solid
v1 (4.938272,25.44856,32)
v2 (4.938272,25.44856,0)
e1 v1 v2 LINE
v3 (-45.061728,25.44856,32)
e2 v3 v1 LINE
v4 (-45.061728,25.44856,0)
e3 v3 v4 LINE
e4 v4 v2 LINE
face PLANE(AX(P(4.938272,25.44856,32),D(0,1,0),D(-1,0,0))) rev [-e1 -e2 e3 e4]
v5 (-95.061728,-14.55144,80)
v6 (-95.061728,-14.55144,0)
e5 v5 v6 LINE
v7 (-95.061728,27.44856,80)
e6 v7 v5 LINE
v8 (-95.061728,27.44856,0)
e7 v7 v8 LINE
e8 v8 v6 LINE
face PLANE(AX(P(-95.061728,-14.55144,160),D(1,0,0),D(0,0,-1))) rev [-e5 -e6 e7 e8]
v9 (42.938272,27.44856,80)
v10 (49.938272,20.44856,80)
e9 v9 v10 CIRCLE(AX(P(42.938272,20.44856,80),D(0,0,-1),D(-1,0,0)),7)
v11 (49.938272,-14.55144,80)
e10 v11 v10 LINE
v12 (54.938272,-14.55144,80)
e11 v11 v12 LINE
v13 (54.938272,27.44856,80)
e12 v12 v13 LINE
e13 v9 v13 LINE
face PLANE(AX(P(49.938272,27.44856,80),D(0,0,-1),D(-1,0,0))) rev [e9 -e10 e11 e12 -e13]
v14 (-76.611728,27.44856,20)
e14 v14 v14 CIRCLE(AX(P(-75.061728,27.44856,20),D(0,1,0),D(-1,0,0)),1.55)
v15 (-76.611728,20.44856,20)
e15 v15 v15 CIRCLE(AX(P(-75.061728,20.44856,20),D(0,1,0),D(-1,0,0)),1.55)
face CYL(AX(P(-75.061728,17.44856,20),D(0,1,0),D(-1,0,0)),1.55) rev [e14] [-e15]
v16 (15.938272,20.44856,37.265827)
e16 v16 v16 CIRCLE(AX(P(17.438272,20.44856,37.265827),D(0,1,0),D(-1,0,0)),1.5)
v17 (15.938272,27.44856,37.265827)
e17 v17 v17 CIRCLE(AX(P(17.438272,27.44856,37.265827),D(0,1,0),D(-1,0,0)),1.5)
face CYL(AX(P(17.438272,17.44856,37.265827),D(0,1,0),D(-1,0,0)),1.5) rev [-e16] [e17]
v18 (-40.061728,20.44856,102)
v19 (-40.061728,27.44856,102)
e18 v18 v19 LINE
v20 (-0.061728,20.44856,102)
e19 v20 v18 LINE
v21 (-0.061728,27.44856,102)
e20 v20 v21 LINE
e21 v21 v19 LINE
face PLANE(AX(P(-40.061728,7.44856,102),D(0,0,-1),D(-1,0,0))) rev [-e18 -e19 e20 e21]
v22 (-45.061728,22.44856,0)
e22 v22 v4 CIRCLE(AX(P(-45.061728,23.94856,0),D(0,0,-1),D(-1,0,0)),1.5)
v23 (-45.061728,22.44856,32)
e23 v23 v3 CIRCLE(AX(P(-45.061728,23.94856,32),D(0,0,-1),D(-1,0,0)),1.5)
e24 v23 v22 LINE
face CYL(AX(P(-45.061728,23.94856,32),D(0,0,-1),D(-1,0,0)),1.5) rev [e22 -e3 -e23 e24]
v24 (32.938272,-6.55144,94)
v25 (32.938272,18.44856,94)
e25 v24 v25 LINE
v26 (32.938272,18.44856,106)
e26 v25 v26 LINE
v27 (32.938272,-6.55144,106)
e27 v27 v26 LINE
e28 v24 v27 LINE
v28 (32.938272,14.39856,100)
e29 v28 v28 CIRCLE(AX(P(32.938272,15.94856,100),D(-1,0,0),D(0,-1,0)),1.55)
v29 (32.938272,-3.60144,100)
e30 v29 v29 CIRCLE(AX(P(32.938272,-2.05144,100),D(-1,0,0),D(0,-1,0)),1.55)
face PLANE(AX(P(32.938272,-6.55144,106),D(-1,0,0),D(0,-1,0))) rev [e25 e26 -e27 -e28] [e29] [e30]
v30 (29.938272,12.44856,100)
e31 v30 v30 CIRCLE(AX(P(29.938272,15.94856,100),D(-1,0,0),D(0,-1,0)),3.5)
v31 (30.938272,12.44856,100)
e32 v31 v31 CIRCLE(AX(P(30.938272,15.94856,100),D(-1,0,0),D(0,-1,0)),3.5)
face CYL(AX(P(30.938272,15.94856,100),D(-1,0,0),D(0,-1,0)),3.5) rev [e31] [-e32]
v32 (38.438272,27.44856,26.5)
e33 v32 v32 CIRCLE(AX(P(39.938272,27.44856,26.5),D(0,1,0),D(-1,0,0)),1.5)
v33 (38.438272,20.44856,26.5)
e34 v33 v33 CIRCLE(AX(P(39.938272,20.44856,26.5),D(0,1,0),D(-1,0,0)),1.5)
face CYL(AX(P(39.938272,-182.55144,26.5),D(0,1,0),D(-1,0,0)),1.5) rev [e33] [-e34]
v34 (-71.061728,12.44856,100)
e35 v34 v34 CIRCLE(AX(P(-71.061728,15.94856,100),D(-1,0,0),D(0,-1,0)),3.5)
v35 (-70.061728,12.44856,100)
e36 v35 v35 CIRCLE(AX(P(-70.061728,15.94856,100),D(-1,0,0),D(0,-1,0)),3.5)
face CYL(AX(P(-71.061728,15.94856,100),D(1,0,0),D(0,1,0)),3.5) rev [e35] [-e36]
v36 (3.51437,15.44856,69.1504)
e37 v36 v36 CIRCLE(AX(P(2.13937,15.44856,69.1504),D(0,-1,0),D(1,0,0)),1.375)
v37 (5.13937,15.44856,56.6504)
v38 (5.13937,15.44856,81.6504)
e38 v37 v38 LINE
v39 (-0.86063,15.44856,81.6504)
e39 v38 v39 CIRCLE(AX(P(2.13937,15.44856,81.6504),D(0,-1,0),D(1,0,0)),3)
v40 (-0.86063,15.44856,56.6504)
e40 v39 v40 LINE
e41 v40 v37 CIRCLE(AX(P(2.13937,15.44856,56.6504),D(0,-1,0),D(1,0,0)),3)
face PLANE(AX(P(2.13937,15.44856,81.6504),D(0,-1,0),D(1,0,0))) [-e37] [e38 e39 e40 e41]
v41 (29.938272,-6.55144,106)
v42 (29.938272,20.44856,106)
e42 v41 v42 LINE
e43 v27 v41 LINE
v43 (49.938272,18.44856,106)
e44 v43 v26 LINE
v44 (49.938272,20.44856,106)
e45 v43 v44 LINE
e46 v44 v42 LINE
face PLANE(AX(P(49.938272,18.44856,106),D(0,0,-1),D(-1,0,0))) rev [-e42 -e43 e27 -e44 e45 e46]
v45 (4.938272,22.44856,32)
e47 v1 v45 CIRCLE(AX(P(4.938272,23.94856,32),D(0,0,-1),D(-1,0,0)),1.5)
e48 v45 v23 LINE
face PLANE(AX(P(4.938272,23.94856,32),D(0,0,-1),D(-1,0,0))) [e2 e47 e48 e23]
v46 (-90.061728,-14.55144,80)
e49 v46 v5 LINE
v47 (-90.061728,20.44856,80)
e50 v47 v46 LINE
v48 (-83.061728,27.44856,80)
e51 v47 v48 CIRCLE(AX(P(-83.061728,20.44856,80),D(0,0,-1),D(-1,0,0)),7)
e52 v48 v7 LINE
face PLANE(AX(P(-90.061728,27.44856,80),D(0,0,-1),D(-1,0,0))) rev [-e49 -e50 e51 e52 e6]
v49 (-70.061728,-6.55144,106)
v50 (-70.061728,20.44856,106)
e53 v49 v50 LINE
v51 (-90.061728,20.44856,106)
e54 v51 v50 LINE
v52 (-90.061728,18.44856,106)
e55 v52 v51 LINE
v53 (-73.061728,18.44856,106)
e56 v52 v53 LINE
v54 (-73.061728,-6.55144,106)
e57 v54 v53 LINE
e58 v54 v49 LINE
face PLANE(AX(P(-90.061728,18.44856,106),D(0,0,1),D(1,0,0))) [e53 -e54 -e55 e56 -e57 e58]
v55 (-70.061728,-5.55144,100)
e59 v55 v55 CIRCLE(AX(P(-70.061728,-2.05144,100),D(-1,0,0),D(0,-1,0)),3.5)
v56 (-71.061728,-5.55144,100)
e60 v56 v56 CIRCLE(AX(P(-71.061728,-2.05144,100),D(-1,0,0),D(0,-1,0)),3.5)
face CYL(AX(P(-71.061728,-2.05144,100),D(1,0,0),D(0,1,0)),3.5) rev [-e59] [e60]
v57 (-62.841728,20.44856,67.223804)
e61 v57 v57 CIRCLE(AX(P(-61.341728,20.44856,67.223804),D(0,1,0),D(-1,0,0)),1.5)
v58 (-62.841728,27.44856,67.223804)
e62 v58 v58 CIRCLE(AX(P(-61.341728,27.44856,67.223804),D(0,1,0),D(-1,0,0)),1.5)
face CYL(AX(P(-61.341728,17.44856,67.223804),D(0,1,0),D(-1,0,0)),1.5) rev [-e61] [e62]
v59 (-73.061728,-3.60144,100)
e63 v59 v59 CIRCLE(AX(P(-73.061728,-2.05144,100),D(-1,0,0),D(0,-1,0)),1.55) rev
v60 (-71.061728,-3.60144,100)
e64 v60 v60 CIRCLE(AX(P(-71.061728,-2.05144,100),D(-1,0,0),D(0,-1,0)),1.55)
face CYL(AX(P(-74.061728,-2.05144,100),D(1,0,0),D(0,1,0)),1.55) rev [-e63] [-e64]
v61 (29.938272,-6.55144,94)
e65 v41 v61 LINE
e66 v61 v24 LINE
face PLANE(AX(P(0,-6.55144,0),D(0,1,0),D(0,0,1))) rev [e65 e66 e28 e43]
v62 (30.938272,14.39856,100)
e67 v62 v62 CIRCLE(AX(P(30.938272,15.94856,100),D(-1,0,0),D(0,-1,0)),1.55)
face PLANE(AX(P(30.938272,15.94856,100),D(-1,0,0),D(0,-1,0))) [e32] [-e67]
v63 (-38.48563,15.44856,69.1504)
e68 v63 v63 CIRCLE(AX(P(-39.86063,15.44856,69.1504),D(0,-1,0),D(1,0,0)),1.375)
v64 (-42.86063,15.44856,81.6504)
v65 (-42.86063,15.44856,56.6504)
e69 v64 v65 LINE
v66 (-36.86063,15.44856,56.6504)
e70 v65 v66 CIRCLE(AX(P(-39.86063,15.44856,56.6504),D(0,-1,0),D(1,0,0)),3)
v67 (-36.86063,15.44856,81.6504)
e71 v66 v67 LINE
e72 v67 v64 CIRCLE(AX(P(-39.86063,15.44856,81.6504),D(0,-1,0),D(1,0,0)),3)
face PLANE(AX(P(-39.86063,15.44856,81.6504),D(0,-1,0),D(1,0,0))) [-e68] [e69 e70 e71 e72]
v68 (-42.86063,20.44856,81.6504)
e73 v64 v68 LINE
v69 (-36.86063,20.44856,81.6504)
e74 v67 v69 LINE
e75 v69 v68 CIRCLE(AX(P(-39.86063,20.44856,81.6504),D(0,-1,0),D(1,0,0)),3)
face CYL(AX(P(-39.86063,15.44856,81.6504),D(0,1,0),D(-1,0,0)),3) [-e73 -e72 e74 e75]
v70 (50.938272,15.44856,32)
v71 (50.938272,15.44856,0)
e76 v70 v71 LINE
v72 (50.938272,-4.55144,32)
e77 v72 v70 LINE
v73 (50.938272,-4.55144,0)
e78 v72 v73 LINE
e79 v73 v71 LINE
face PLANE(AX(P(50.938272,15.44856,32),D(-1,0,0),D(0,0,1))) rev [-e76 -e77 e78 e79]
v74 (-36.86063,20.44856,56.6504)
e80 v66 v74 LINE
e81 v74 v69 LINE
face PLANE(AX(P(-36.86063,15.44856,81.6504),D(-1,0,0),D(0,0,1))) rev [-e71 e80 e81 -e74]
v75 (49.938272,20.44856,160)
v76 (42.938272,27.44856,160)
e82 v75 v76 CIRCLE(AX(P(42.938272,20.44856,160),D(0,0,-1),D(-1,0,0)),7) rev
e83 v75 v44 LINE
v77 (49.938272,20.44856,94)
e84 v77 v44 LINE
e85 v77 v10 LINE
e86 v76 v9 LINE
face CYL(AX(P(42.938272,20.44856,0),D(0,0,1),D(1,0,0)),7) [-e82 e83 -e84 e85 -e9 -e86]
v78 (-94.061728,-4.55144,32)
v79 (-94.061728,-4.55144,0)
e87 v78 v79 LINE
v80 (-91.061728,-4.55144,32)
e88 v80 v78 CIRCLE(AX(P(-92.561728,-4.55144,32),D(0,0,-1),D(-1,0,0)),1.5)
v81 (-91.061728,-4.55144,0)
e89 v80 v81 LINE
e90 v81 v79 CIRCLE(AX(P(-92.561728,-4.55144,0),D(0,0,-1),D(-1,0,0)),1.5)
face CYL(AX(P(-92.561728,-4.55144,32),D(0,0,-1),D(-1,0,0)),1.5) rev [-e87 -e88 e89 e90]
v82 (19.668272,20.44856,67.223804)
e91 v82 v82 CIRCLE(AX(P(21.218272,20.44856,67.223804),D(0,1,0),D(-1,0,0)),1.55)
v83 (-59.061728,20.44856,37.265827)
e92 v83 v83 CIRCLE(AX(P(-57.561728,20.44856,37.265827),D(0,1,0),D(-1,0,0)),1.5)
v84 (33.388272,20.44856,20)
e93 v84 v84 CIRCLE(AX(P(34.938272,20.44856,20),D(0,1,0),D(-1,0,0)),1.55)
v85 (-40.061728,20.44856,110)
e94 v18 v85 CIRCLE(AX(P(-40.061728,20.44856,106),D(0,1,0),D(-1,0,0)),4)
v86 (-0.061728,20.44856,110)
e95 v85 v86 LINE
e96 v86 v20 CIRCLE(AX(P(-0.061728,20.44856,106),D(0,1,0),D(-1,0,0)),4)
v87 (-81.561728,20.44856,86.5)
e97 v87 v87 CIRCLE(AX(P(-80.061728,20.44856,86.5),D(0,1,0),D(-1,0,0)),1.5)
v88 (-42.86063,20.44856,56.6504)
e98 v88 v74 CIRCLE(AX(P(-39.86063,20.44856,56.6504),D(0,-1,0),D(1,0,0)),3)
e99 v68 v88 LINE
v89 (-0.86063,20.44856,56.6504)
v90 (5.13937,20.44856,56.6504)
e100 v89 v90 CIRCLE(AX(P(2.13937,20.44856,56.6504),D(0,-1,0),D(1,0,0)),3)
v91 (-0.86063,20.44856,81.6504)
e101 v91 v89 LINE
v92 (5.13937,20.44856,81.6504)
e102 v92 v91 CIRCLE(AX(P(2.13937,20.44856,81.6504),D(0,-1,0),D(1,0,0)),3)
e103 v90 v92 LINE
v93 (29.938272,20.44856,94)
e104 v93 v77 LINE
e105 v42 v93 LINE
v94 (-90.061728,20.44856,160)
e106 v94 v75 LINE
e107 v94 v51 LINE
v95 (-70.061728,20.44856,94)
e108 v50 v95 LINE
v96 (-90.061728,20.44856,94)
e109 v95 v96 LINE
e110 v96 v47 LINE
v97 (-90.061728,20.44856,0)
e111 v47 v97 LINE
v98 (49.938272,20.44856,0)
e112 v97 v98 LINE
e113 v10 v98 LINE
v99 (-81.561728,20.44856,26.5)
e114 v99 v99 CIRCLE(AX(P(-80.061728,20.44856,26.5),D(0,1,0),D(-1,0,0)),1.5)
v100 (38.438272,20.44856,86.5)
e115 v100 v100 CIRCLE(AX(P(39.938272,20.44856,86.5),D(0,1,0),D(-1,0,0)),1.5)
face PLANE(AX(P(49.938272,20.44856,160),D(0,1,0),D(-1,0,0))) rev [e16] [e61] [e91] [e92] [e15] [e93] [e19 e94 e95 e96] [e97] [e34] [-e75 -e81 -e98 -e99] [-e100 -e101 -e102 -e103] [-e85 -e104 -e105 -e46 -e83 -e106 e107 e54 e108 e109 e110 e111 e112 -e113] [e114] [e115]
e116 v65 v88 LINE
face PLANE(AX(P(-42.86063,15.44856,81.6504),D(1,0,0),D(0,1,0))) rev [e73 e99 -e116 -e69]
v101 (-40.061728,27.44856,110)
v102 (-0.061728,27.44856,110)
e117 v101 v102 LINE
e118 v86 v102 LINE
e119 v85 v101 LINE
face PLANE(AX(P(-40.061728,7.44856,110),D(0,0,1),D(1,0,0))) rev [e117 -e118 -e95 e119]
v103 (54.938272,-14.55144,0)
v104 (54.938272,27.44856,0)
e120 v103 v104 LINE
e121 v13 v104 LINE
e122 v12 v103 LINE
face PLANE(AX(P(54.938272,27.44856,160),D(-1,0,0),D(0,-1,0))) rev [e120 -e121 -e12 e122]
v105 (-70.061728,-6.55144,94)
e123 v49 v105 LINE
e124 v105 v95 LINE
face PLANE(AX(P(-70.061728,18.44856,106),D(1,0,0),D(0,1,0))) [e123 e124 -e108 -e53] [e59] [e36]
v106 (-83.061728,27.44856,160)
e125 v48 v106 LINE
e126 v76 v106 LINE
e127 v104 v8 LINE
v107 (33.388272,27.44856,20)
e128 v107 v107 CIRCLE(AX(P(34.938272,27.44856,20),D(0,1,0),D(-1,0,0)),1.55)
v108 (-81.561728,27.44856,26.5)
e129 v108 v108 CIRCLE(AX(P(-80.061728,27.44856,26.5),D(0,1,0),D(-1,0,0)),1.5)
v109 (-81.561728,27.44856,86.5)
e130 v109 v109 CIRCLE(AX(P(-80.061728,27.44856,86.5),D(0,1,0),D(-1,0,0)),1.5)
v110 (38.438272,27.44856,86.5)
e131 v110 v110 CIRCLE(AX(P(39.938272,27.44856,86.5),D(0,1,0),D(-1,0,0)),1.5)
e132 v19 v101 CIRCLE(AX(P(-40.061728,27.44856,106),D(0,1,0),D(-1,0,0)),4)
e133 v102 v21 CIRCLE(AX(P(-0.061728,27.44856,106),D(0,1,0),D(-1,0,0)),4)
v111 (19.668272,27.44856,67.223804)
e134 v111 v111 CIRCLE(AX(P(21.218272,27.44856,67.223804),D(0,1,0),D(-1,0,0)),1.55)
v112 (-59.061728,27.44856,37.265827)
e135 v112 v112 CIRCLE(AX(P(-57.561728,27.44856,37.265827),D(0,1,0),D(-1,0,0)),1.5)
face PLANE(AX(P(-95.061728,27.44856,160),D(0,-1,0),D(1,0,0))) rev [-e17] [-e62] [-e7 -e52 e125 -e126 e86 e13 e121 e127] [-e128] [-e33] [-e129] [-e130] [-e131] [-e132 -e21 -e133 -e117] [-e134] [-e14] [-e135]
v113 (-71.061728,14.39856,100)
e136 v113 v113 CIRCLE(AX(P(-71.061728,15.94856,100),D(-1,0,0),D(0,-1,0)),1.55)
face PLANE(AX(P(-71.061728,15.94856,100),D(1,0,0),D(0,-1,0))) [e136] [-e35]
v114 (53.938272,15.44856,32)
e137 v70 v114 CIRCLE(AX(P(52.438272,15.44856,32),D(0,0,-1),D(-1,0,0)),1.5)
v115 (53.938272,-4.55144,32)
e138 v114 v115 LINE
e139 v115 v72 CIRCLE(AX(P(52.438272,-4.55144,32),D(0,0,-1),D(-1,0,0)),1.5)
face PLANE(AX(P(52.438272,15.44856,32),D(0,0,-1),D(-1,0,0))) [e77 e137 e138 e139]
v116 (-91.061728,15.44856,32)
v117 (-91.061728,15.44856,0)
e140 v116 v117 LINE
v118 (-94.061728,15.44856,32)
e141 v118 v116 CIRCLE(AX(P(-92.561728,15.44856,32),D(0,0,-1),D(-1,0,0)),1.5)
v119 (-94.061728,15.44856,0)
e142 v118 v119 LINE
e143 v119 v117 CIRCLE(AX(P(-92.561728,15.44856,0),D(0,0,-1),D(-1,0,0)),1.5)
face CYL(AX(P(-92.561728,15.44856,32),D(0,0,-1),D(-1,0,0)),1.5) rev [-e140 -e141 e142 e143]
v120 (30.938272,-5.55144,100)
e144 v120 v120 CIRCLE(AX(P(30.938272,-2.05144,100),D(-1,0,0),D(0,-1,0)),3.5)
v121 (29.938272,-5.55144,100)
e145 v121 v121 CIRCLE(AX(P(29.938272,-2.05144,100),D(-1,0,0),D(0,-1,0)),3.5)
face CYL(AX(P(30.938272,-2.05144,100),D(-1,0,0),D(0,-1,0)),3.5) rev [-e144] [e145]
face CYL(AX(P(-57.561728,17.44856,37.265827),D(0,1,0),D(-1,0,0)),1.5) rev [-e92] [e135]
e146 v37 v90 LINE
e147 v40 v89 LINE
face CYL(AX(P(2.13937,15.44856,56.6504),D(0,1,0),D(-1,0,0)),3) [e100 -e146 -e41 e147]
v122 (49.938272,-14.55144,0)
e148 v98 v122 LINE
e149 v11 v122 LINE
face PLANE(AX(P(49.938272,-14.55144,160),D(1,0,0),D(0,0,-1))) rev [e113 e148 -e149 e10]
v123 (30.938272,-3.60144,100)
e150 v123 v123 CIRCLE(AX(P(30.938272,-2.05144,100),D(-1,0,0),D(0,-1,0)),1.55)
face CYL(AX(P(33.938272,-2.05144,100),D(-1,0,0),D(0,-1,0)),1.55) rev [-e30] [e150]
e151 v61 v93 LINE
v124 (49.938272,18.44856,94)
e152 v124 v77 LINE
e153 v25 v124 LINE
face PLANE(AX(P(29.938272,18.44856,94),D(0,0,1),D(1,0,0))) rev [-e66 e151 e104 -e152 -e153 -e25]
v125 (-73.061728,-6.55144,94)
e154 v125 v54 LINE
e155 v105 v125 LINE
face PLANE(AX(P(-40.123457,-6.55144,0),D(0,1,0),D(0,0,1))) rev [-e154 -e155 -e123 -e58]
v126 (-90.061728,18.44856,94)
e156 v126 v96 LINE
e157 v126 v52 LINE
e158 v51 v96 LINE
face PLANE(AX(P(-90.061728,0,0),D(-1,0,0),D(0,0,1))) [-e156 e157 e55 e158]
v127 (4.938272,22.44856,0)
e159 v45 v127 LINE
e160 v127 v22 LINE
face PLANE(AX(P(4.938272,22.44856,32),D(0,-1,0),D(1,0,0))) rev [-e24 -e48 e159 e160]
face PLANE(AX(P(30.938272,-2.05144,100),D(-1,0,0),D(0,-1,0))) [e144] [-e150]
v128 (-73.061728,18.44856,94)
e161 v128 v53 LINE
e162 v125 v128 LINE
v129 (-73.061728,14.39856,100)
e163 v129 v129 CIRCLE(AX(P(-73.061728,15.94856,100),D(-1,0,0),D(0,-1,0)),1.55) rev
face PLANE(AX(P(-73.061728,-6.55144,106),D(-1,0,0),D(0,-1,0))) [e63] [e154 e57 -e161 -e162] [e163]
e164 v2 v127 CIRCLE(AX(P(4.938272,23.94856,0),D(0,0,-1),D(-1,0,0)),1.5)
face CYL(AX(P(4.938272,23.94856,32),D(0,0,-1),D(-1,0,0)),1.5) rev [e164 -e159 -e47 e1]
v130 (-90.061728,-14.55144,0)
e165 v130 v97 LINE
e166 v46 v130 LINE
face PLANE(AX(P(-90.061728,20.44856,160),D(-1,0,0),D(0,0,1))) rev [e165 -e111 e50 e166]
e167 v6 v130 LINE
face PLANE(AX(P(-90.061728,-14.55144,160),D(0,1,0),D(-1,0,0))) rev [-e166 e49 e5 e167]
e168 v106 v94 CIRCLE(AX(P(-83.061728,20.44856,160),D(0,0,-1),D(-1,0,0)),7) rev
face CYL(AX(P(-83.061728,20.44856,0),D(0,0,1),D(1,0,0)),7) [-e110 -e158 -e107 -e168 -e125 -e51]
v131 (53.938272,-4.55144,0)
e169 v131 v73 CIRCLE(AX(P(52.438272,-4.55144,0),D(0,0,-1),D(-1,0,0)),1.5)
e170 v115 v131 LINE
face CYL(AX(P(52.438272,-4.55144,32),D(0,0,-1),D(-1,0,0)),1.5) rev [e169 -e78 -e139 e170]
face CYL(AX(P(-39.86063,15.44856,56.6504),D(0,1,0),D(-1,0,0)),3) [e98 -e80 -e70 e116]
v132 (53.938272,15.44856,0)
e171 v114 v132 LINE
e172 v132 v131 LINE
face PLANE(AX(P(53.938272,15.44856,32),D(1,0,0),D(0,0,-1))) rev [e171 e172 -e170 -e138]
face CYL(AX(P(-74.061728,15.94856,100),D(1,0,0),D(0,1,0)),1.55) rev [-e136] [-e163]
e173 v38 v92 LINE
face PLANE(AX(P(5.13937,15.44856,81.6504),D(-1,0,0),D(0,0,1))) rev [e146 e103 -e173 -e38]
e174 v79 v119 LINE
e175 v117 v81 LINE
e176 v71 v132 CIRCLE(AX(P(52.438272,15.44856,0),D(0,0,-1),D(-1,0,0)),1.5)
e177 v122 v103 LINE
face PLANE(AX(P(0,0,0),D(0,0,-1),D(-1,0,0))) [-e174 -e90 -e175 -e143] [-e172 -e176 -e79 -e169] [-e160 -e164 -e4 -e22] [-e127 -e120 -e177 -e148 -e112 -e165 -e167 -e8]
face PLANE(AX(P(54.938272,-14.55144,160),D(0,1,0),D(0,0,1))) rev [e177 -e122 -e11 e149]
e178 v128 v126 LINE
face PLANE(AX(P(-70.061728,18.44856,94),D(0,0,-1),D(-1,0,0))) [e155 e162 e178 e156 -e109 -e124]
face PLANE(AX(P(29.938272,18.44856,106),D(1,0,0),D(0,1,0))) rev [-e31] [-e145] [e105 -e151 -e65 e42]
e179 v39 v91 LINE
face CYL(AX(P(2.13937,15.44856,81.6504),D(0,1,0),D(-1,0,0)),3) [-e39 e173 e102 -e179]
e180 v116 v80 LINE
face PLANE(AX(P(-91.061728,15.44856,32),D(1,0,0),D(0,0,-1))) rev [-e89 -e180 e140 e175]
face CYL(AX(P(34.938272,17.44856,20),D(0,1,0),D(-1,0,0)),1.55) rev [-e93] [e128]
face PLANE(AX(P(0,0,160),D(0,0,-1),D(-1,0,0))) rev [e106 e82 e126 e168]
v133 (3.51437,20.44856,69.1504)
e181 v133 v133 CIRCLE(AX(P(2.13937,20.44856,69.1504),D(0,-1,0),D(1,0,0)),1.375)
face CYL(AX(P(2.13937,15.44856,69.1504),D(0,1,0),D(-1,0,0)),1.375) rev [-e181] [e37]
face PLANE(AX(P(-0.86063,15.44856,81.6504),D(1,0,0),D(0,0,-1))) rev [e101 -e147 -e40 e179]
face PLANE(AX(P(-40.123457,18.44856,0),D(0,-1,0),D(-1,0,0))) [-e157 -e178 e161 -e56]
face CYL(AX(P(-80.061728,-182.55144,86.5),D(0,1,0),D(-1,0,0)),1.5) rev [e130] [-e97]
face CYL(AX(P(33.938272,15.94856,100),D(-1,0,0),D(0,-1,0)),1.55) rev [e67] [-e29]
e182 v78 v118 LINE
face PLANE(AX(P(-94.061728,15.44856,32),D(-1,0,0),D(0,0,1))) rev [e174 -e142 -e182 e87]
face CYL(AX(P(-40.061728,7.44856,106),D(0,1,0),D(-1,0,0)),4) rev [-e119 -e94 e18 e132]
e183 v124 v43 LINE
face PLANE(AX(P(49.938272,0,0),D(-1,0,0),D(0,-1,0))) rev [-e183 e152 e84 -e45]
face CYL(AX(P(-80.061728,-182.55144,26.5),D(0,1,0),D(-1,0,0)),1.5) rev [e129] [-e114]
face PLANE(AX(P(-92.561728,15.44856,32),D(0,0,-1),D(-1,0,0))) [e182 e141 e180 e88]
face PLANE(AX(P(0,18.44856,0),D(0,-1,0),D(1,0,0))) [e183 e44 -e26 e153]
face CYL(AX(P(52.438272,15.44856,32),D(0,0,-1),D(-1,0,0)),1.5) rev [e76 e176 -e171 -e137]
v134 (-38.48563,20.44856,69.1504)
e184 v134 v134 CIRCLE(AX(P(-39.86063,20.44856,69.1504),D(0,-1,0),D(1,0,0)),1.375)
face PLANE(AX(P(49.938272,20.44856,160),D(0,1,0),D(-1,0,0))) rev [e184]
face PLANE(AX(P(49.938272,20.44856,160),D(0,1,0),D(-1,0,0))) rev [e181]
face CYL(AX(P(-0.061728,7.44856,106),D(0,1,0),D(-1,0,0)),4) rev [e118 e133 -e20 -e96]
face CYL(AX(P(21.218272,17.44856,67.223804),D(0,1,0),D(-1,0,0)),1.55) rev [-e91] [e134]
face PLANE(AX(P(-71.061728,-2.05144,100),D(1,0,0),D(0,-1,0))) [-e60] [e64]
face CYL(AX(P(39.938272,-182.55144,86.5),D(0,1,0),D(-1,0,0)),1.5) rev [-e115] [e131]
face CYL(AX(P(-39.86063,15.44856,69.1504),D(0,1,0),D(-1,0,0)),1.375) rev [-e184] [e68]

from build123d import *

# Parameters (mm, degrees)
BOSS_EXTRUDE1_DEPTH = 160
CUT_EXTRUDE1_DEPTH  = 32
SKETCH3_R           = 7.5
CUT_EXTRUDE2_DEPTH  = 210
SKETCH5_R           = 1.5
CUT_EXTRUDE4_DEPTH  = 210
CUT_EXTRUDE6_DEPTH  = 20
SKETCH8_R           = 1.55
CUT_EXTRUDE7_DEPTH  = 10
SKETCH9_W           = 20
SKETCH9_H           = 12
BOSS_EXTRUDE3_DEPTH = 2
SKETCH10_W          = 3
SKETCH10_H          = 12
BOSS_EXTRUDE4_DEPTH = 25
SKETCH11_R          = 3.5
CUT_EXTRUDE8_DEPTH  = 1
SKETCH12_R          = 1.55
CUT_EXTRUDE9_DEPTH  = 3
SKETCH13_R          = 1.5
SKETCH13_R_2        = 1.55
CUT_EXTRUDE10_DEPTH = 10
SKETCH14_R          = 1.375
BOSS_EXTRUDE5_DEPTH = 5
SKETCH15_W          = 80
SKETCH15_H          = 42
CUT_EXTRUDE11_DEPTH = 5
FILLET1_R           = 7
SKETCH16_W          = 80
SKETCH16_H          = 42
CUT_EXTRUDE12_DEPTH = 5
FILLET2_R           = 7


with BuildPart() as part:
    # Sketch1 → Boss-Extrude1 (new body)
    with BuildSketch(Plane.XY):
        Polygon((-95.061728395, -14.551440329), (-95.061728395, 27.448559671), (54.938271605, 27.448559671), (54.938271605, -14.551440329), (49.938271605, -14.551440329), (49.938271605, 20.448559671), (-90.061728395, 20.448559671), (-90.061728395, -14.551440329), align=None)
    extrude(amount=BOSS_EXTRUDE1_DEPTH)

    # Sketch2 → Cut-Extrude1 (cut)
    with BuildSketch(Plane(origin=(0, 0, 0), x_dir=(-1, 0, 0), z_dir=(0, 0, -1))):
        with BuildLine():
            Line((-50.938271605, 15.448559671), (-50.938271605, -4.551440329))
            ThreePointArc((-50.938271605, -4.551440329), (-52.438271605, -6.051440329), (-53.938271605, -4.551440329))
            Line((-53.938271605, -4.551440329), (-53.938271605, 15.448559671))
            ThreePointArc((-53.938271605, 15.448559671), (-52.438271605, 16.948559671), (-50.938271605, 15.448559671))
        make_face()
        with BuildLine():
            Line((-4.938271605, 25.448559671), (45.061728395, 25.448559671))
            ThreePointArc((45.061728395, 25.448559671), (46.561728395, 23.948559671), (45.061728395, 22.448559671))
            Line((45.061728395, 22.448559671), (-4.938271605, 22.448559671))
            ThreePointArc((-4.938271605, 22.448559671), (-6.438271605, 23.948559671), (-4.938271605, 25.448559671))
        make_face()
        with BuildLine():
            Line((94.061728395, 15.448559671), (94.061728395, -4.551440329))
            ThreePointArc((94.061728395, -4.551440329), (92.561728395, -6.051440329), (91.061728395, -4.551440329))
            Line((91.061728395, -4.551440329), (91.061728395, 15.448559671))
            ThreePointArc((91.061728395, 15.448559671), (92.561728395, 16.948559671), (94.061728395, 15.448559671))
        make_face()
    extrude(amount=-CUT_EXTRUDE1_DEPTH, mode=Mode.SUBTRACT)

    # Sketch3 → Cut-Extrude2 (cut)
    with BuildSketch(Plane.ZY.offset(95.061728395)):
        with Locations((120, 7.448559671)):
            Circle(SKETCH3_R)
    extrude(amount=-CUT_EXTRUDE2_DEPTH, mode=Mode.SUBTRACT)

    # Sketch5 → Cut-Extrude4 (cut)
    with BuildSketch(Plane(origin=(0, 27.448559671, 0), x_dir=(1, 0, 0), z_dir=(0, 1, 0))):
        with Locations(Location((-80.061728395, -26.5, 0), (0, 0, 180))):
            Circle(SKETCH5_R)
        with Locations(Location((39.938271605, -26.5, 0), (0, 0, 180))):
            Circle(SKETCH5_R)
        with Locations(Location((-80.061728395, -86.5, 0), (0, 0, 180))):
            Circle(SKETCH5_R)
        with Locations(Location((39.938271605, -86.5, 0), (0, 0, 180))):
            Circle(SKETCH5_R)
    extrude(amount=-CUT_EXTRUDE4_DEPTH, mode=Mode.SUBTRACT)

    # Sketch7 → Cut-Extrude6 (cut)
    with BuildSketch(Plane(origin=(0, 27.448559671, 0), x_dir=(1, 0, 0), z_dir=(0, 1, 0))):
        with BuildLine():
            Line((-40.061728395, -102), (-0.061728395, -102))
            ThreePointArc((-0.061728395, -102), (3.938271605, -106), (-0.061728395, -110))
            Line((-0.061728395, -110), (-40.061728395, -110))
            ThreePointArc((-40.061728395, -110), (-44.061728395, -106), (-40.061728395, -102))
        make_face()
    extrude(amount=-CUT_EXTRUDE6_DEPTH, mode=Mode.SUBTRACT)

    # Sketch8 → Cut-Extrude7 (cut)
    with BuildSketch(Plane(origin=(0, 27.448559671, 0), x_dir=(1, 0, 0), z_dir=(0, 1, 0))):
        with Locations(Location((-75.061728395, -20, 0), (0, 0, 180))):
            Circle(SKETCH8_R)
        with Locations(Location((34.938271605, -20, 0), (0, 0, 180))):
            Circle(SKETCH8_R)
    extrude(amount=-CUT_EXTRUDE7_DEPTH, mode=Mode.SUBTRACT)

    # Sketch9 → Boss-Extrude3 (add)
    with BuildSketch(Plane.XZ.offset(-20.448559671)):
        with Locations((39.938271605, 100)):
            Rectangle(SKETCH9_W, SKETCH9_H)
    boss_extrude3 = extrude(amount=BOSS_EXTRUDE3_DEPTH)

    # Sketch10 → Boss-Extrude4 (add)
    with BuildSketch(Plane.XZ.offset(-18.448559671)):
        with Locations((31.438271605, 100)):
            Rectangle(SKETCH10_W, SKETCH10_H)
    boss_extrude4 = extrude(amount=BOSS_EXTRUDE4_DEPTH)

    # Sketch11 → Cut-Extrude8 (cut)
    with BuildSketch(Plane.ZY.offset(-29.938271605)):
        with Locations(Location((100, 15.948559671, 0), (0, 0, 270))):
            Circle(SKETCH11_R)
        with Locations(Location((100, -2.051440329, 0), (0, 0, 270))):
            Circle(SKETCH11_R)
    cut_extrude8 = extrude(amount=-CUT_EXTRUDE8_DEPTH, mode=Mode.SUBTRACT)

    # Sketch12 → Cut-Extrude9 (cut)
    with BuildSketch(Plane.ZY.offset(-30.938271605)):
        with Locations(Location((100, 15.948559671, 0), (0, 0, 270))):
            Circle(SKETCH12_R)
        with Locations(Location((100, -2.051440329, 0), (0, 0, 270))):
            Circle(SKETCH12_R)
    cut_extrude9 = extrude(amount=-CUT_EXTRUDE9_DEPTH, mode=Mode.SUBTRACT)

    # Mirror1: Boss-Extrude3, Boss-Extrude4, Cut-Extrude8, Cut-Extrude9 across plane
    add(boss_extrude3.mirror(Plane.ZY.offset(20.061728395)))
    add(boss_extrude4.mirror(Plane.ZY.offset(20.061728395)))
    add(cut_extrude8.mirror(Plane.ZY.offset(20.061728395)), mode=Mode.SUBTRACT)
    add(cut_extrude9.mirror(Plane.ZY.offset(20.061728395)), mode=Mode.SUBTRACT)

    # Sketch13 → Cut-Extrude10 (cut)
    with BuildSketch(Plane(origin=(0, 27.448559671, 0), x_dir=(1, 0, 0), z_dir=(0, 1, 0))):
        with Locations(Location((17.438271605, -37.265826534, 0), (0, 0, 180))):
            Circle(SKETCH13_R)
        with Locations(Location((-57.561728395, -37.265826534, 0), (0, 0, 180))):
            Circle(SKETCH13_R)
        with Locations(Location((-61.341728395, -67.223803809, 0), (0, 0, 180))):
            Circle(SKETCH13_R)
        with Locations(Location((21.218271605, -67.223803809, 0), (0, 0, 180))):
            Circle(SKETCH13_R_2)
    extrude(amount=-CUT_EXTRUDE10_DEPTH, mode=Mode.SUBTRACT)

    # Sketch14 → Boss-Extrude5 (add)
    # profile 1 of 2: a face of its own
    with BuildSketch(Plane.XZ.offset(-20.448559671)):
        with BuildLine():
            Line((5.139369782, 81.650400065), (5.139369782, 56.650400065))
            ThreePointArc((5.139369782, 56.650400065), (2.139369782, 53.650400065), (-0.860630218, 56.650400065))
            Line((-0.860630218, 56.650400065), (-0.860630218, 81.650400065))
            ThreePointArc((-0.860630218, 81.650400065), (2.139369782, 84.650400065), (5.139369782, 81.650400065))
        make_face()
        with Locations((2.139369782, 69.150400065)):
            Circle(SKETCH14_R, mode=Mode.SUBTRACT)
    # profile 2 of 2: a face of its own
    with BuildSketch(Plane.XZ.offset(-20.448559671)):
        with BuildLine():
            Line((-36.860630218, 81.650400065), (-36.860630218, 56.650400065))
            ThreePointArc((-36.860630218, 56.650400065), (-39.860630218, 53.650400065), (-42.860630218, 56.650400065))
            Line((-42.860630218, 56.650400065), (-42.860630218, 81.650400065))
            ThreePointArc((-42.860630218, 81.650400065), (-39.860630218, 84.650400065), (-36.860630218, 81.650400065))
        make_face()
        with Locations((-39.860630218, 69.150400065)):
            Circle(SKETCH14_R, mode=Mode.SUBTRACT)
    extrude(amount=BOSS_EXTRUDE5_DEPTH)

    # Sketch15 → Cut-Extrude11 (cut)
    with BuildSketch(Plane(origin=(54.938271605, 0, 0), x_dir=(0, 0, -1), z_dir=(1, 0, 0))):
        with Locations((-120, 6.448559671)):
            Rectangle(SKETCH15_W, SKETCH15_H)
    extrude(amount=-CUT_EXTRUDE11_DEPTH, mode=Mode.SUBTRACT)

    # Fillet1
    fillet1_edges = [part.edges().sort_by_distance(p)[0] for p in [
        (49.938271605, 27.448559671, 120),
    ]]
    fillet(fillet1_edges, radius=FILLET1_R - 0.0001)  # a hair under: the kernel refuses the full size

    # Sketch16 → Cut-Extrude12 (cut)
    with BuildSketch(Plane.ZY.offset(95.061728395)):
        with Locations((120, 6.448559671)):
            Rectangle(SKETCH16_W, SKETCH16_H)
    extrude(amount=-CUT_EXTRUDE12_DEPTH, mode=Mode.SUBTRACT)

    # Fillet2
    fillet2_edges = [part.edges().sort_by_distance(p)[0] for p in [
        (-90.061728395, 27.448559671, 120),
    ]]
    fillet(fillet2_edges, radius=FILLET2_R - 0.0001)  # a hair under: the kernel refuses the full size


solid = part.part
